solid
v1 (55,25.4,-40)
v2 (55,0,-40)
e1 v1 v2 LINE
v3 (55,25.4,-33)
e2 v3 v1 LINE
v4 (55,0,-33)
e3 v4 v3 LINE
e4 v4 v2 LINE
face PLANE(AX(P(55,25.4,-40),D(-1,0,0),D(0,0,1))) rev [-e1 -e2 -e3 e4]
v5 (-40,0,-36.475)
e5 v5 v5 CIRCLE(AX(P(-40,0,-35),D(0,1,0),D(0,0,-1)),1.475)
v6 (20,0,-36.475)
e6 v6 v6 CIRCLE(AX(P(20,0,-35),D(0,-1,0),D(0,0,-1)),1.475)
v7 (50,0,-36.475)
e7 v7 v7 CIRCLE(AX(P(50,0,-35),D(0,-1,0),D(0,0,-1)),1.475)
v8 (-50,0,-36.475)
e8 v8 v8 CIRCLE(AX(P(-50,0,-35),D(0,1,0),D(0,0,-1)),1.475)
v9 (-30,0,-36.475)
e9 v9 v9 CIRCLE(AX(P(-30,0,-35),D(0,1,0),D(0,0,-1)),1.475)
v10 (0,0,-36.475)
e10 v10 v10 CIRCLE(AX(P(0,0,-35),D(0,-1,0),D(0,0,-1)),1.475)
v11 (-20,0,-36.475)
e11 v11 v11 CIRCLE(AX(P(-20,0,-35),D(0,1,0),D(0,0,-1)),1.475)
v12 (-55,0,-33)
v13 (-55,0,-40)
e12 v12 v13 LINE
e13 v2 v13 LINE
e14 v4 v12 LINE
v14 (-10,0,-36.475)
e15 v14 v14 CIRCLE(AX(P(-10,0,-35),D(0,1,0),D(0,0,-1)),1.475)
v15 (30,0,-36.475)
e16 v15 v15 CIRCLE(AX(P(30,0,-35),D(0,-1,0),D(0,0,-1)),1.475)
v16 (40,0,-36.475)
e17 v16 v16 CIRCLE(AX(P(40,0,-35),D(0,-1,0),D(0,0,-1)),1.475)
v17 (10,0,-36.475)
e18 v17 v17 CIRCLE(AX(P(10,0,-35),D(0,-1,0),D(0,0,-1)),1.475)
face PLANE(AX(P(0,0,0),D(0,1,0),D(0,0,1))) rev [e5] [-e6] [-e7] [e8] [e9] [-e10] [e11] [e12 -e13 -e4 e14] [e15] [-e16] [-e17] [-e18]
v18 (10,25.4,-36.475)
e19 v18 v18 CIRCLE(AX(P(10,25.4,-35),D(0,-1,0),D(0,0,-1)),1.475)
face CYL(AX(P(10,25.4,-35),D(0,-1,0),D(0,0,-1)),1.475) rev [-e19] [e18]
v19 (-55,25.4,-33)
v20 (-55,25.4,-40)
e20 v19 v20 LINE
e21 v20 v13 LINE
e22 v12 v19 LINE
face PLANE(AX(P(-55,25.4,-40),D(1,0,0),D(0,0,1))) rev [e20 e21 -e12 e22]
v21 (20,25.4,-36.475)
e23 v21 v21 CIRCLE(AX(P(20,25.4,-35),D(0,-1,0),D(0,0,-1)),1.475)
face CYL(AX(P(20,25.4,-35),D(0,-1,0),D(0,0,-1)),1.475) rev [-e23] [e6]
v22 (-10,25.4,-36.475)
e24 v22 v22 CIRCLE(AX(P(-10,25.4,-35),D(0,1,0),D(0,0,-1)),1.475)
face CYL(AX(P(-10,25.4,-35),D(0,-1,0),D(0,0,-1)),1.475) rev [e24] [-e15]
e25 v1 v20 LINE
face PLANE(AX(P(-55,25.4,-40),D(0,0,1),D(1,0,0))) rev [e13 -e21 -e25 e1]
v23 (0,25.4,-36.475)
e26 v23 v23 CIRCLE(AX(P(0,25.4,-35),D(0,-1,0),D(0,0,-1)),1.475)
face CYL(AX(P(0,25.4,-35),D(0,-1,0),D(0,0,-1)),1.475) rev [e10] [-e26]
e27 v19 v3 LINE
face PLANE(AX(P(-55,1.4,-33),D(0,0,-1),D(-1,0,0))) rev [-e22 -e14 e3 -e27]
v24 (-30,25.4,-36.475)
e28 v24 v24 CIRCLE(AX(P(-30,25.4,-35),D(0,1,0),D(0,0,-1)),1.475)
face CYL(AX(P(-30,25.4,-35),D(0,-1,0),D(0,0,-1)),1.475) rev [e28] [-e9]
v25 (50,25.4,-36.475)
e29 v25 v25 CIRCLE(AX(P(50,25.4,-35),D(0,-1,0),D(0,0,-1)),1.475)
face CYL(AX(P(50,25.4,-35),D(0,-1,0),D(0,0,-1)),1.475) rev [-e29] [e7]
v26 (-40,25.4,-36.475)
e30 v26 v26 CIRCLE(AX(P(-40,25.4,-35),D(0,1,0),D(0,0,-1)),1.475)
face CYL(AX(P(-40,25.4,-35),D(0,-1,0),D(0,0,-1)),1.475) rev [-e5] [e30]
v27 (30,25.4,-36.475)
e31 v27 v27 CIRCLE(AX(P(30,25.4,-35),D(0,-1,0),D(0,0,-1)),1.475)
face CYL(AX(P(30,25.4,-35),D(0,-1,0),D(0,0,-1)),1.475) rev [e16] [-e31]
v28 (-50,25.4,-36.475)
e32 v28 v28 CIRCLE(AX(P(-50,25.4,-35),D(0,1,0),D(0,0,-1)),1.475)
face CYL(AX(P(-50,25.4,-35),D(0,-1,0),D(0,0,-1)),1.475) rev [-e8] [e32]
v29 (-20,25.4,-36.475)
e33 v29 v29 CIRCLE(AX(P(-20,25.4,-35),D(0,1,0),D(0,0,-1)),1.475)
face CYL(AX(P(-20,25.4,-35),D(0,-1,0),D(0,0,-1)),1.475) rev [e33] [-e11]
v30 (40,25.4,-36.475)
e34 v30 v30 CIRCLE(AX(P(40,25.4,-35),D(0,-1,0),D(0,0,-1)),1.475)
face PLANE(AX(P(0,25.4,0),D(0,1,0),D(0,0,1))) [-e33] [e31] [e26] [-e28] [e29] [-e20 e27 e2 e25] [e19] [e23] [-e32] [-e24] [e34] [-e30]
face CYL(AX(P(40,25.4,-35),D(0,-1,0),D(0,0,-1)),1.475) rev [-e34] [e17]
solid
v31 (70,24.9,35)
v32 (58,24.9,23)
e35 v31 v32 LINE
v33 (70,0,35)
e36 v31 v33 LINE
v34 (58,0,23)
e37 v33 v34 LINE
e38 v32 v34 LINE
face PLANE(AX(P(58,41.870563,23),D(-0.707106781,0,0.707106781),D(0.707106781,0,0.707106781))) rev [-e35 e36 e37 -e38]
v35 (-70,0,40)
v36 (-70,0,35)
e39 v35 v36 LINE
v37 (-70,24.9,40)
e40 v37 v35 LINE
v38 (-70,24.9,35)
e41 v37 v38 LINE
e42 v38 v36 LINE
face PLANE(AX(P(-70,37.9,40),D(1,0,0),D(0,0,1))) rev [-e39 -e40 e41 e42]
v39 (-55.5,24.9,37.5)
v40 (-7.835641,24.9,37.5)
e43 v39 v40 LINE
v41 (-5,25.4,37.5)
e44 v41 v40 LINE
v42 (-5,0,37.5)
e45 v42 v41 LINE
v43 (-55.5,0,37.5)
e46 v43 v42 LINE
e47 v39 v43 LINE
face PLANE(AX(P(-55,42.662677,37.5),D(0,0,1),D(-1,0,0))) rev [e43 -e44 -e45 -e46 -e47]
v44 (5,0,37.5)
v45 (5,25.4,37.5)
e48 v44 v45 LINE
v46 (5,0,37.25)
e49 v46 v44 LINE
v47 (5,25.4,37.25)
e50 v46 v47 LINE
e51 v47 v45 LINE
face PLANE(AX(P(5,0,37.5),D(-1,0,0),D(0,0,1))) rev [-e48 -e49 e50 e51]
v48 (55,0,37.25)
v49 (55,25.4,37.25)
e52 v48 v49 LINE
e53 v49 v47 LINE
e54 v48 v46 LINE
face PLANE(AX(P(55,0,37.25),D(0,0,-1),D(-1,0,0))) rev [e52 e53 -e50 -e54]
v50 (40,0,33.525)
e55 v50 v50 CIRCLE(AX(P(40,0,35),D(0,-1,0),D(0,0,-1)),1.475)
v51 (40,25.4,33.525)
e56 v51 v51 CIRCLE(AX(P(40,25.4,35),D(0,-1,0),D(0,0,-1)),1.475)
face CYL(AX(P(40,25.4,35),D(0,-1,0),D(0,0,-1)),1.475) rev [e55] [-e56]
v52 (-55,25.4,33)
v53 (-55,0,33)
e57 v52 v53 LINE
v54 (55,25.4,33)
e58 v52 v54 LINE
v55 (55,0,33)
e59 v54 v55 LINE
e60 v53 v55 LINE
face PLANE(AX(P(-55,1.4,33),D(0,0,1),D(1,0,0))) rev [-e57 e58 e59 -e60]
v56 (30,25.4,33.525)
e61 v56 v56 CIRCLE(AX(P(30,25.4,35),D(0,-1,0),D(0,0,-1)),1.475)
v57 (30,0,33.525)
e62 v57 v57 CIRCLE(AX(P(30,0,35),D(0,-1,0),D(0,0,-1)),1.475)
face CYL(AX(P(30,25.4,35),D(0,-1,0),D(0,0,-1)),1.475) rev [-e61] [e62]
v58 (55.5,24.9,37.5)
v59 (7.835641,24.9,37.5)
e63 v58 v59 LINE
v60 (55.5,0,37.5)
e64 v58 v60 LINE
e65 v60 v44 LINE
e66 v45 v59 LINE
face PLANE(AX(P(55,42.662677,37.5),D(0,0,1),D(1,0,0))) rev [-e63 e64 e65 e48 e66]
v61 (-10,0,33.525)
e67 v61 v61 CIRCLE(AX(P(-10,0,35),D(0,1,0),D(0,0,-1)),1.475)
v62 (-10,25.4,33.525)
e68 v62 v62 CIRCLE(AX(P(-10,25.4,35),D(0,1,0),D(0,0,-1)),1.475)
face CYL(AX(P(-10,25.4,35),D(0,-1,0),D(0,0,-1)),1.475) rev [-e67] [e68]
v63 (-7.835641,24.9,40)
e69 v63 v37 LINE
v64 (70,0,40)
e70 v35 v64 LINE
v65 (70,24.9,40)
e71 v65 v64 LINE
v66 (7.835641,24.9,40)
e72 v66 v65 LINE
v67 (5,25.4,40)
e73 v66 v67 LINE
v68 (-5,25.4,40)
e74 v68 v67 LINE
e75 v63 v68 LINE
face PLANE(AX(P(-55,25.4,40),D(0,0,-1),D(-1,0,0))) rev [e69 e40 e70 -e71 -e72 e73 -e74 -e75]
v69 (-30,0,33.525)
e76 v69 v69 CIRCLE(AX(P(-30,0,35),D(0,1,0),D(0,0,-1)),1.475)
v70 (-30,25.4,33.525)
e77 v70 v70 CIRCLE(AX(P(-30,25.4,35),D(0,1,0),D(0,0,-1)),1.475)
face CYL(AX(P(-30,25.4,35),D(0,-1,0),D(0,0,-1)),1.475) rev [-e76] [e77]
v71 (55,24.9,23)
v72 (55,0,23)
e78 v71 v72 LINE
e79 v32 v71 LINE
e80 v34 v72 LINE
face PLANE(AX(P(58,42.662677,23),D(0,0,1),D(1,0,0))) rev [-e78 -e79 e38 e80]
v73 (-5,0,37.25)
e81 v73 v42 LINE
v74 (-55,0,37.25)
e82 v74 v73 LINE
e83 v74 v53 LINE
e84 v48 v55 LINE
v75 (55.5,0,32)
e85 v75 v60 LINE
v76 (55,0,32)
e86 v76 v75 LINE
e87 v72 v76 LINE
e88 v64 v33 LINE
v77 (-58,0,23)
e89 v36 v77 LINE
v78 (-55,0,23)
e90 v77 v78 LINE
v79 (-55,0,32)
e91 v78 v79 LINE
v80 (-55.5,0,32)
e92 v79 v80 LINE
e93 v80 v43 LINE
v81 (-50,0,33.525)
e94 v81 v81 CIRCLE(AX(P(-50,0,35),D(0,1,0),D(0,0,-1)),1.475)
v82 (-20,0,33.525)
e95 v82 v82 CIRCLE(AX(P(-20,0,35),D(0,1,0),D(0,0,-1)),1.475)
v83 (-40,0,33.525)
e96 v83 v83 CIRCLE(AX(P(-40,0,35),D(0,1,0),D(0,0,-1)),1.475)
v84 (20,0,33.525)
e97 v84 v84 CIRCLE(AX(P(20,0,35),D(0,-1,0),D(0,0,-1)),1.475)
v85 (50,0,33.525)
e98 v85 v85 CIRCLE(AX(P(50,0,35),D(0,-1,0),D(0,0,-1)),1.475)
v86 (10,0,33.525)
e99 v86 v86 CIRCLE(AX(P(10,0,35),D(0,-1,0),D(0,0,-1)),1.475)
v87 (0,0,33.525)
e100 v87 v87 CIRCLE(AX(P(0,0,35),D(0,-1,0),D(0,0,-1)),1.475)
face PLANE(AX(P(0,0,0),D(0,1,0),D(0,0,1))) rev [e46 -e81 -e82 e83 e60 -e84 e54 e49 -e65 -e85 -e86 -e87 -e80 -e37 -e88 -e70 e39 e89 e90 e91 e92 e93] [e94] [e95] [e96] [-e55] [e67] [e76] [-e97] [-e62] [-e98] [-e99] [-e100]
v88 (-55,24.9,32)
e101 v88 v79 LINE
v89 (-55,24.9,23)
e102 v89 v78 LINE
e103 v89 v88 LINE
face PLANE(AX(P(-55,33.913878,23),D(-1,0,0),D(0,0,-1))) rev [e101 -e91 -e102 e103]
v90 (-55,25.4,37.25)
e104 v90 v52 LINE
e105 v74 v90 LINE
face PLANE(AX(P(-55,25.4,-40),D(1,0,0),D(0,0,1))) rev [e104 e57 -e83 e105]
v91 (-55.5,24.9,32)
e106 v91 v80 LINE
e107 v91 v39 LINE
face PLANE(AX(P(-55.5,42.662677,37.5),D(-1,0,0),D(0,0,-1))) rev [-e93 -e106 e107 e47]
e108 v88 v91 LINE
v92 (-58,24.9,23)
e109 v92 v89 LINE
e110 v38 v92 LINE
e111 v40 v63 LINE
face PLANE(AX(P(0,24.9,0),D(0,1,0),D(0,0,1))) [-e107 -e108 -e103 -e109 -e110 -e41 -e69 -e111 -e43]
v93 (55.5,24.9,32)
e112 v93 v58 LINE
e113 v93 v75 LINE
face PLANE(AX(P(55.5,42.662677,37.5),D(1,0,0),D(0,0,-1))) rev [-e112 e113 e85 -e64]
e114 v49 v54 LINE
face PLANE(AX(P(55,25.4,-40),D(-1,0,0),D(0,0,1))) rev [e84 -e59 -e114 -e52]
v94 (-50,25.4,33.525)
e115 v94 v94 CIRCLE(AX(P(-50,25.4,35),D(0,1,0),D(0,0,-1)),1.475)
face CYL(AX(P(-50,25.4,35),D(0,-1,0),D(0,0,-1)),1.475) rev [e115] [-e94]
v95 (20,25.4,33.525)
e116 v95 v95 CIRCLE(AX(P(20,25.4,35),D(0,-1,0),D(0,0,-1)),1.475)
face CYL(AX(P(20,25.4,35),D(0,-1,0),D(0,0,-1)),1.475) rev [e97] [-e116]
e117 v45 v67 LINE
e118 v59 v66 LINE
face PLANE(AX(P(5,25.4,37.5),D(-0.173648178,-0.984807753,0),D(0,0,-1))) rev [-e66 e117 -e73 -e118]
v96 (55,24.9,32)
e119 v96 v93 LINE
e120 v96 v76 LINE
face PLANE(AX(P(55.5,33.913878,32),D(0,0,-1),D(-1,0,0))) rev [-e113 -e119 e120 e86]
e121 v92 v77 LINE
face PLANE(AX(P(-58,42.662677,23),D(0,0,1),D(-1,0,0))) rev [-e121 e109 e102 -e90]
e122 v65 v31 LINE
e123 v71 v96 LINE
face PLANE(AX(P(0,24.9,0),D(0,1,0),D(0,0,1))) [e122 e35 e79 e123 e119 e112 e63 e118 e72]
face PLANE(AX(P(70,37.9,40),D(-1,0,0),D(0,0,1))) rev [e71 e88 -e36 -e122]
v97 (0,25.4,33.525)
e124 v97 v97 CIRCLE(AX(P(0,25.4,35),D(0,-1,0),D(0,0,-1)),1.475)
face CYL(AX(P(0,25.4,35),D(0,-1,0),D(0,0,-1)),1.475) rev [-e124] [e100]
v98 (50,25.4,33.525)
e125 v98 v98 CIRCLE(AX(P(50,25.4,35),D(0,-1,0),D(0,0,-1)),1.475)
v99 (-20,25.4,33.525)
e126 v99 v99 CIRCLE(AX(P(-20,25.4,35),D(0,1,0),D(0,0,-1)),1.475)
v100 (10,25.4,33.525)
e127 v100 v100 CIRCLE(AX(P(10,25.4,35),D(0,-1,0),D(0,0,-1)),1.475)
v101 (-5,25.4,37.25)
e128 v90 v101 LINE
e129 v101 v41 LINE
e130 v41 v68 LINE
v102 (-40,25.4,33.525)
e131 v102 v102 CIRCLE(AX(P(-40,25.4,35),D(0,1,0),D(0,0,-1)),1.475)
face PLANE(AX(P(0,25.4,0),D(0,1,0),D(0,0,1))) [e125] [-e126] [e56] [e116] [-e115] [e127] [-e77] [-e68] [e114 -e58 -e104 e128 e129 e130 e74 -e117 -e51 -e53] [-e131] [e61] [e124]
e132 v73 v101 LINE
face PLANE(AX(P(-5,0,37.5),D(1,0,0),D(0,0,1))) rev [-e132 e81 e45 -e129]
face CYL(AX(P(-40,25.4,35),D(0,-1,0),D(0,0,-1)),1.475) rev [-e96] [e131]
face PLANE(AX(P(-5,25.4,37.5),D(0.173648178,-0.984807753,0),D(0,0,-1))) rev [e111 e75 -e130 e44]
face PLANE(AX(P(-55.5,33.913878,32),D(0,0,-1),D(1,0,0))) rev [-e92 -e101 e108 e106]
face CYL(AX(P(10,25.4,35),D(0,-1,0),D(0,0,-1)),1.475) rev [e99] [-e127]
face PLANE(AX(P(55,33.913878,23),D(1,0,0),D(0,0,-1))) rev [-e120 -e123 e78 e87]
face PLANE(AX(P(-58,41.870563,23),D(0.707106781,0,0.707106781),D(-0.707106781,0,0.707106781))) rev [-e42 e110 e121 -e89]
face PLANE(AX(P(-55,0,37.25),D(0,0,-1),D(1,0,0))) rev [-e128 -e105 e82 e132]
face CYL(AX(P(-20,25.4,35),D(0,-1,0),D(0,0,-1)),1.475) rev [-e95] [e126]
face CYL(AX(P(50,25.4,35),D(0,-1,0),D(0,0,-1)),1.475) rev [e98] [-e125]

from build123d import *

# Parameters (mm, degrees)
SKETCH1_W           = 110
SKETCH1_H           = 80
BOSS_EXTRUDE1_DEPTH = 25.4
SKETCH2_W           = 66
SKETCH2_H           = 24
CUT_EXTRUDE1_DEPTH  = 120.771282034
SKETCH3_R           = 1.475
CUT_EXTRUDE2_DEPTH  = 73.595867651
LPATTERN1_COUNT     = 6
LPATTERN1_PITCH     = 10
LPATTERN1_COL_COUNT = 6
LPATTERN1_COL_PITCH = 10
BOSS_EXTRUDE2_DEPTH = 24.9
SKETCH11_W          = 10
SKETCH11_H          = 66
CUT_EXTRUDE7_DEPTH  = 75.431176264
SKETCH12_W          = 0.5
SKETCH12_H          = 9
BOSS_EXTRUDE5_DEPTH = 24.9
SKETCH5_W           = 50
SKETCH5_H           = 0.25
CUT_EXTRUDE3_DEPTH  = 75.894325553
SKETCH6_W           = 50
SKETCH6_H           = 2.5
CUT_EXTRUDE4_DEPTH  = 0.5
SKETCH7_W           = 12
SKETCH7_H           = 5
BOSS_EXTRUDE3_DEPTH = 24.9
BOSS_EXTRUDE4_DEPTH = 24.9
CHAMFER1_SIZE2      = 2.83564091
CHAMFER1_SIZE       = 0.5
SKETCH9_W           = 55
SKETCH9_H           = 80
CUT_EXTRUDE5_DEPTH  = 85.529048262
SKETCH10_W          = 90
SKETCH10_H          = 66
CUT_EXTRUDE6_DEPTH  = 85.118963379


with BuildPart() as part:
    # Sketch1 → Boss-Extrude1 (new body)
    with BuildSketch(Plane(origin=(0, 0, 0), x_dir=(1, 0, 0), z_dir=(0, 1, 0))):
        Rectangle(SKETCH1_W, SKETCH1_H)
    extrude(amount=BOSS_EXTRUDE1_DEPTH)

    # Sketch2 → Cut-Extrude1 (cut, through all)
    with BuildSketch(Plane(origin=(55, 0, 0), x_dir=(0, 0, -1), z_dir=(1, 0, 0))):
        with Locations((0, 13.4)):
            Rectangle(SKETCH2_W, SKETCH2_H)
    extrude(amount=-CUT_EXTRUDE1_DEPTH, mode=Mode.SUBTRACT)

    # Sketch3 → Cut-Extrude2 (cut, through all)
    with BuildSketch(Plane.XZ):
        with Locations(Location((0, 35, 0), (0, 0, 270))):
            Circle(SKETCH3_R)
        with Locations(Location((0, -35, 0), (0, 0, 270))):
            Circle(SKETCH3_R)
    cut_extrude2 = extrude(amount=-CUT_EXTRUDE2_DEPTH, mode=Mode.SUBTRACT)

    # LPattern1: Cut-Extrude2 ×6
    with Locations(*[(i * LPATTERN1_PITCH, 0, 0) for i in range(1, LPATTERN1_COUNT)]):
        add(cut_extrude2, mode=Mode.SUBTRACT)

    # LPattern1 col: Cut-Extrude2 ×6
    with Locations(*[(-i * LPATTERN1_COL_PITCH, 0, 0) for i in range(1, LPATTERN1_COL_COUNT)]):
        add(cut_extrude2, mode=Mode.SUBTRACT)

    # Sketch4 → Boss-Extrude2 (add)
    with BuildSketch(Plane(origin=(0, 0, 0), x_dir=(1, 0, 0), z_dir=(0, 1, 0))):
        Polygon((55, -40), (58, -40), (58, -37.5), (58, -23), (55.5, -23), (55.5, -37.5), (55, -37.5), align=None)
    extrude(amount=BOSS_EXTRUDE2_DEPTH)

    # Sketch11 → Cut-Extrude7 (cut, through all)
    with BuildSketch(Plane(origin=(0, 1.4, 0), x_dir=(1, 0, 0), z_dir=(0, 1, 0))):
        with Locations((50, 0)):
            Rectangle(SKETCH11_W, SKETCH11_H)
    extrude(amount=-CUT_EXTRUDE7_DEPTH, mode=Mode.SUBTRACT)

    # Sketch12 → Boss-Extrude5 (add)
    with BuildSketch(Plane(origin=(0, 0, 0), x_dir=(1, 0, 0), z_dir=(0, 1, 0))):
        with Locations((55.25, -27.5)):
            Rectangle(SKETCH12_W, SKETCH12_H)
    extrude(amount=BOSS_EXTRUDE5_DEPTH)

    # Sketch5 → Cut-Extrude3 (cut, through all)
    with BuildSketch(Plane(origin=(0, 25.4, 0), x_dir=(1, 0, 0), z_dir=(0, 1, 0))):
        with Locations((30, -37.375)):
            Rectangle(SKETCH5_W, SKETCH5_H)
    extrude(amount=-CUT_EXTRUDE3_DEPTH, mode=Mode.SUBTRACT)

    # Sketch6 → Cut-Extrude4 (cut)
    with BuildSketch(Plane(origin=(0, 25.4, 0), x_dir=(1, 0, 0), z_dir=(0, 1, 0))):
        with Locations((30, -38.75)):
            Rectangle(SKETCH6_W, SKETCH6_H)
    extrude(amount=-CUT_EXTRUDE4_DEPTH, mode=Mode.SUBTRACT)

    # Sketch7 → Boss-Extrude3 (add)
    with BuildSketch(Plane(origin=(0, 0, 0), x_dir=(1, 0, 0), z_dir=(0, 1, 0))):
        with Locations((64, -37.5)):
            Rectangle(SKETCH7_W, SKETCH7_H)
    extrude(amount=BOSS_EXTRUDE3_DEPTH)

    # Sketch8 → Boss-Extrude4 (add)
    with BuildSketch(Plane(origin=(0, 0, 0), x_dir=(1, 0, 0), z_dir=(0, 1, 0))):
        Polygon((58, -23), (70, -35), (58, -35), align=None)
    extrude(amount=BOSS_EXTRUDE4_DEPTH)

    # Chamfer1
    chamfer1_edges = [part.edges().sort_by_distance(p)[0] for p in [
        (5, 24.9, 38.75),
    ]]
    chamfer1_side = [part.faces().sort_by_distance(p)[0] for p in [
        (5, 24.91, 38.75),
    ]]
    chamfer(chamfer1_edges, length=CHAMFER1_SIZE - 0.0001, length2=CHAMFER1_SIZE2 - 0.0001, reference=chamfer1_side[0])  # a hair under: the kernel refuses the full size

    # Sketch9 → Cut-Extrude5 (cut, through all)
    with BuildSketch(Plane(origin=(0, 25.4, 0), x_dir=(1, 0, 0), z_dir=(0, 1, 0))):
        with Locations((-27.5, 0)):
            Rectangle(SKETCH9_W, SKETCH9_H)
    extrude(amount=-CUT_EXTRUDE5_DEPTH, mode=Mode.SUBTRACT)

    # Mirror1: part across plane


with BuildPart() as part_1:
    add(part.part)
    add(part.part.mirror(Plane(origin=(0, 0, -40), x_dir=(0, 0, 1), z_dir=(1, 0, 0))))

    # Sketch10 → Cut-Extrude6 (cut, through all)
    with BuildSketch(Plane(origin=(0, 1.4, 0), x_dir=(1, 0, 0), z_dir=(0, 1, 0))):
        Rectangle(SKETCH10_W, SKETCH10_H)
    extrude(amount=-CUT_EXTRUDE6_DEPTH, mode=Mode.SUBTRACT)


with BuildPart() as cut_extrude6_piece_1:
    # of the separate pieces the step leaves, piece 1, a body of its own (cut_extrude6_pieces)
    add(part_1.part.solids().sort_by_distance((5, 25.3999, 40))[0])


with BuildPart() as cut_extrude6_piece_2:
    # of the separate pieces the step leaves, piece 2, a body of its own (cut_extrude6_pieces)
    add(part_1.part.solids().sort_by_distance((55, 0, -33))[0])


solid = Compound([cut_extrude6_piece_1.part, cut_extrude6_piece_2.part])
